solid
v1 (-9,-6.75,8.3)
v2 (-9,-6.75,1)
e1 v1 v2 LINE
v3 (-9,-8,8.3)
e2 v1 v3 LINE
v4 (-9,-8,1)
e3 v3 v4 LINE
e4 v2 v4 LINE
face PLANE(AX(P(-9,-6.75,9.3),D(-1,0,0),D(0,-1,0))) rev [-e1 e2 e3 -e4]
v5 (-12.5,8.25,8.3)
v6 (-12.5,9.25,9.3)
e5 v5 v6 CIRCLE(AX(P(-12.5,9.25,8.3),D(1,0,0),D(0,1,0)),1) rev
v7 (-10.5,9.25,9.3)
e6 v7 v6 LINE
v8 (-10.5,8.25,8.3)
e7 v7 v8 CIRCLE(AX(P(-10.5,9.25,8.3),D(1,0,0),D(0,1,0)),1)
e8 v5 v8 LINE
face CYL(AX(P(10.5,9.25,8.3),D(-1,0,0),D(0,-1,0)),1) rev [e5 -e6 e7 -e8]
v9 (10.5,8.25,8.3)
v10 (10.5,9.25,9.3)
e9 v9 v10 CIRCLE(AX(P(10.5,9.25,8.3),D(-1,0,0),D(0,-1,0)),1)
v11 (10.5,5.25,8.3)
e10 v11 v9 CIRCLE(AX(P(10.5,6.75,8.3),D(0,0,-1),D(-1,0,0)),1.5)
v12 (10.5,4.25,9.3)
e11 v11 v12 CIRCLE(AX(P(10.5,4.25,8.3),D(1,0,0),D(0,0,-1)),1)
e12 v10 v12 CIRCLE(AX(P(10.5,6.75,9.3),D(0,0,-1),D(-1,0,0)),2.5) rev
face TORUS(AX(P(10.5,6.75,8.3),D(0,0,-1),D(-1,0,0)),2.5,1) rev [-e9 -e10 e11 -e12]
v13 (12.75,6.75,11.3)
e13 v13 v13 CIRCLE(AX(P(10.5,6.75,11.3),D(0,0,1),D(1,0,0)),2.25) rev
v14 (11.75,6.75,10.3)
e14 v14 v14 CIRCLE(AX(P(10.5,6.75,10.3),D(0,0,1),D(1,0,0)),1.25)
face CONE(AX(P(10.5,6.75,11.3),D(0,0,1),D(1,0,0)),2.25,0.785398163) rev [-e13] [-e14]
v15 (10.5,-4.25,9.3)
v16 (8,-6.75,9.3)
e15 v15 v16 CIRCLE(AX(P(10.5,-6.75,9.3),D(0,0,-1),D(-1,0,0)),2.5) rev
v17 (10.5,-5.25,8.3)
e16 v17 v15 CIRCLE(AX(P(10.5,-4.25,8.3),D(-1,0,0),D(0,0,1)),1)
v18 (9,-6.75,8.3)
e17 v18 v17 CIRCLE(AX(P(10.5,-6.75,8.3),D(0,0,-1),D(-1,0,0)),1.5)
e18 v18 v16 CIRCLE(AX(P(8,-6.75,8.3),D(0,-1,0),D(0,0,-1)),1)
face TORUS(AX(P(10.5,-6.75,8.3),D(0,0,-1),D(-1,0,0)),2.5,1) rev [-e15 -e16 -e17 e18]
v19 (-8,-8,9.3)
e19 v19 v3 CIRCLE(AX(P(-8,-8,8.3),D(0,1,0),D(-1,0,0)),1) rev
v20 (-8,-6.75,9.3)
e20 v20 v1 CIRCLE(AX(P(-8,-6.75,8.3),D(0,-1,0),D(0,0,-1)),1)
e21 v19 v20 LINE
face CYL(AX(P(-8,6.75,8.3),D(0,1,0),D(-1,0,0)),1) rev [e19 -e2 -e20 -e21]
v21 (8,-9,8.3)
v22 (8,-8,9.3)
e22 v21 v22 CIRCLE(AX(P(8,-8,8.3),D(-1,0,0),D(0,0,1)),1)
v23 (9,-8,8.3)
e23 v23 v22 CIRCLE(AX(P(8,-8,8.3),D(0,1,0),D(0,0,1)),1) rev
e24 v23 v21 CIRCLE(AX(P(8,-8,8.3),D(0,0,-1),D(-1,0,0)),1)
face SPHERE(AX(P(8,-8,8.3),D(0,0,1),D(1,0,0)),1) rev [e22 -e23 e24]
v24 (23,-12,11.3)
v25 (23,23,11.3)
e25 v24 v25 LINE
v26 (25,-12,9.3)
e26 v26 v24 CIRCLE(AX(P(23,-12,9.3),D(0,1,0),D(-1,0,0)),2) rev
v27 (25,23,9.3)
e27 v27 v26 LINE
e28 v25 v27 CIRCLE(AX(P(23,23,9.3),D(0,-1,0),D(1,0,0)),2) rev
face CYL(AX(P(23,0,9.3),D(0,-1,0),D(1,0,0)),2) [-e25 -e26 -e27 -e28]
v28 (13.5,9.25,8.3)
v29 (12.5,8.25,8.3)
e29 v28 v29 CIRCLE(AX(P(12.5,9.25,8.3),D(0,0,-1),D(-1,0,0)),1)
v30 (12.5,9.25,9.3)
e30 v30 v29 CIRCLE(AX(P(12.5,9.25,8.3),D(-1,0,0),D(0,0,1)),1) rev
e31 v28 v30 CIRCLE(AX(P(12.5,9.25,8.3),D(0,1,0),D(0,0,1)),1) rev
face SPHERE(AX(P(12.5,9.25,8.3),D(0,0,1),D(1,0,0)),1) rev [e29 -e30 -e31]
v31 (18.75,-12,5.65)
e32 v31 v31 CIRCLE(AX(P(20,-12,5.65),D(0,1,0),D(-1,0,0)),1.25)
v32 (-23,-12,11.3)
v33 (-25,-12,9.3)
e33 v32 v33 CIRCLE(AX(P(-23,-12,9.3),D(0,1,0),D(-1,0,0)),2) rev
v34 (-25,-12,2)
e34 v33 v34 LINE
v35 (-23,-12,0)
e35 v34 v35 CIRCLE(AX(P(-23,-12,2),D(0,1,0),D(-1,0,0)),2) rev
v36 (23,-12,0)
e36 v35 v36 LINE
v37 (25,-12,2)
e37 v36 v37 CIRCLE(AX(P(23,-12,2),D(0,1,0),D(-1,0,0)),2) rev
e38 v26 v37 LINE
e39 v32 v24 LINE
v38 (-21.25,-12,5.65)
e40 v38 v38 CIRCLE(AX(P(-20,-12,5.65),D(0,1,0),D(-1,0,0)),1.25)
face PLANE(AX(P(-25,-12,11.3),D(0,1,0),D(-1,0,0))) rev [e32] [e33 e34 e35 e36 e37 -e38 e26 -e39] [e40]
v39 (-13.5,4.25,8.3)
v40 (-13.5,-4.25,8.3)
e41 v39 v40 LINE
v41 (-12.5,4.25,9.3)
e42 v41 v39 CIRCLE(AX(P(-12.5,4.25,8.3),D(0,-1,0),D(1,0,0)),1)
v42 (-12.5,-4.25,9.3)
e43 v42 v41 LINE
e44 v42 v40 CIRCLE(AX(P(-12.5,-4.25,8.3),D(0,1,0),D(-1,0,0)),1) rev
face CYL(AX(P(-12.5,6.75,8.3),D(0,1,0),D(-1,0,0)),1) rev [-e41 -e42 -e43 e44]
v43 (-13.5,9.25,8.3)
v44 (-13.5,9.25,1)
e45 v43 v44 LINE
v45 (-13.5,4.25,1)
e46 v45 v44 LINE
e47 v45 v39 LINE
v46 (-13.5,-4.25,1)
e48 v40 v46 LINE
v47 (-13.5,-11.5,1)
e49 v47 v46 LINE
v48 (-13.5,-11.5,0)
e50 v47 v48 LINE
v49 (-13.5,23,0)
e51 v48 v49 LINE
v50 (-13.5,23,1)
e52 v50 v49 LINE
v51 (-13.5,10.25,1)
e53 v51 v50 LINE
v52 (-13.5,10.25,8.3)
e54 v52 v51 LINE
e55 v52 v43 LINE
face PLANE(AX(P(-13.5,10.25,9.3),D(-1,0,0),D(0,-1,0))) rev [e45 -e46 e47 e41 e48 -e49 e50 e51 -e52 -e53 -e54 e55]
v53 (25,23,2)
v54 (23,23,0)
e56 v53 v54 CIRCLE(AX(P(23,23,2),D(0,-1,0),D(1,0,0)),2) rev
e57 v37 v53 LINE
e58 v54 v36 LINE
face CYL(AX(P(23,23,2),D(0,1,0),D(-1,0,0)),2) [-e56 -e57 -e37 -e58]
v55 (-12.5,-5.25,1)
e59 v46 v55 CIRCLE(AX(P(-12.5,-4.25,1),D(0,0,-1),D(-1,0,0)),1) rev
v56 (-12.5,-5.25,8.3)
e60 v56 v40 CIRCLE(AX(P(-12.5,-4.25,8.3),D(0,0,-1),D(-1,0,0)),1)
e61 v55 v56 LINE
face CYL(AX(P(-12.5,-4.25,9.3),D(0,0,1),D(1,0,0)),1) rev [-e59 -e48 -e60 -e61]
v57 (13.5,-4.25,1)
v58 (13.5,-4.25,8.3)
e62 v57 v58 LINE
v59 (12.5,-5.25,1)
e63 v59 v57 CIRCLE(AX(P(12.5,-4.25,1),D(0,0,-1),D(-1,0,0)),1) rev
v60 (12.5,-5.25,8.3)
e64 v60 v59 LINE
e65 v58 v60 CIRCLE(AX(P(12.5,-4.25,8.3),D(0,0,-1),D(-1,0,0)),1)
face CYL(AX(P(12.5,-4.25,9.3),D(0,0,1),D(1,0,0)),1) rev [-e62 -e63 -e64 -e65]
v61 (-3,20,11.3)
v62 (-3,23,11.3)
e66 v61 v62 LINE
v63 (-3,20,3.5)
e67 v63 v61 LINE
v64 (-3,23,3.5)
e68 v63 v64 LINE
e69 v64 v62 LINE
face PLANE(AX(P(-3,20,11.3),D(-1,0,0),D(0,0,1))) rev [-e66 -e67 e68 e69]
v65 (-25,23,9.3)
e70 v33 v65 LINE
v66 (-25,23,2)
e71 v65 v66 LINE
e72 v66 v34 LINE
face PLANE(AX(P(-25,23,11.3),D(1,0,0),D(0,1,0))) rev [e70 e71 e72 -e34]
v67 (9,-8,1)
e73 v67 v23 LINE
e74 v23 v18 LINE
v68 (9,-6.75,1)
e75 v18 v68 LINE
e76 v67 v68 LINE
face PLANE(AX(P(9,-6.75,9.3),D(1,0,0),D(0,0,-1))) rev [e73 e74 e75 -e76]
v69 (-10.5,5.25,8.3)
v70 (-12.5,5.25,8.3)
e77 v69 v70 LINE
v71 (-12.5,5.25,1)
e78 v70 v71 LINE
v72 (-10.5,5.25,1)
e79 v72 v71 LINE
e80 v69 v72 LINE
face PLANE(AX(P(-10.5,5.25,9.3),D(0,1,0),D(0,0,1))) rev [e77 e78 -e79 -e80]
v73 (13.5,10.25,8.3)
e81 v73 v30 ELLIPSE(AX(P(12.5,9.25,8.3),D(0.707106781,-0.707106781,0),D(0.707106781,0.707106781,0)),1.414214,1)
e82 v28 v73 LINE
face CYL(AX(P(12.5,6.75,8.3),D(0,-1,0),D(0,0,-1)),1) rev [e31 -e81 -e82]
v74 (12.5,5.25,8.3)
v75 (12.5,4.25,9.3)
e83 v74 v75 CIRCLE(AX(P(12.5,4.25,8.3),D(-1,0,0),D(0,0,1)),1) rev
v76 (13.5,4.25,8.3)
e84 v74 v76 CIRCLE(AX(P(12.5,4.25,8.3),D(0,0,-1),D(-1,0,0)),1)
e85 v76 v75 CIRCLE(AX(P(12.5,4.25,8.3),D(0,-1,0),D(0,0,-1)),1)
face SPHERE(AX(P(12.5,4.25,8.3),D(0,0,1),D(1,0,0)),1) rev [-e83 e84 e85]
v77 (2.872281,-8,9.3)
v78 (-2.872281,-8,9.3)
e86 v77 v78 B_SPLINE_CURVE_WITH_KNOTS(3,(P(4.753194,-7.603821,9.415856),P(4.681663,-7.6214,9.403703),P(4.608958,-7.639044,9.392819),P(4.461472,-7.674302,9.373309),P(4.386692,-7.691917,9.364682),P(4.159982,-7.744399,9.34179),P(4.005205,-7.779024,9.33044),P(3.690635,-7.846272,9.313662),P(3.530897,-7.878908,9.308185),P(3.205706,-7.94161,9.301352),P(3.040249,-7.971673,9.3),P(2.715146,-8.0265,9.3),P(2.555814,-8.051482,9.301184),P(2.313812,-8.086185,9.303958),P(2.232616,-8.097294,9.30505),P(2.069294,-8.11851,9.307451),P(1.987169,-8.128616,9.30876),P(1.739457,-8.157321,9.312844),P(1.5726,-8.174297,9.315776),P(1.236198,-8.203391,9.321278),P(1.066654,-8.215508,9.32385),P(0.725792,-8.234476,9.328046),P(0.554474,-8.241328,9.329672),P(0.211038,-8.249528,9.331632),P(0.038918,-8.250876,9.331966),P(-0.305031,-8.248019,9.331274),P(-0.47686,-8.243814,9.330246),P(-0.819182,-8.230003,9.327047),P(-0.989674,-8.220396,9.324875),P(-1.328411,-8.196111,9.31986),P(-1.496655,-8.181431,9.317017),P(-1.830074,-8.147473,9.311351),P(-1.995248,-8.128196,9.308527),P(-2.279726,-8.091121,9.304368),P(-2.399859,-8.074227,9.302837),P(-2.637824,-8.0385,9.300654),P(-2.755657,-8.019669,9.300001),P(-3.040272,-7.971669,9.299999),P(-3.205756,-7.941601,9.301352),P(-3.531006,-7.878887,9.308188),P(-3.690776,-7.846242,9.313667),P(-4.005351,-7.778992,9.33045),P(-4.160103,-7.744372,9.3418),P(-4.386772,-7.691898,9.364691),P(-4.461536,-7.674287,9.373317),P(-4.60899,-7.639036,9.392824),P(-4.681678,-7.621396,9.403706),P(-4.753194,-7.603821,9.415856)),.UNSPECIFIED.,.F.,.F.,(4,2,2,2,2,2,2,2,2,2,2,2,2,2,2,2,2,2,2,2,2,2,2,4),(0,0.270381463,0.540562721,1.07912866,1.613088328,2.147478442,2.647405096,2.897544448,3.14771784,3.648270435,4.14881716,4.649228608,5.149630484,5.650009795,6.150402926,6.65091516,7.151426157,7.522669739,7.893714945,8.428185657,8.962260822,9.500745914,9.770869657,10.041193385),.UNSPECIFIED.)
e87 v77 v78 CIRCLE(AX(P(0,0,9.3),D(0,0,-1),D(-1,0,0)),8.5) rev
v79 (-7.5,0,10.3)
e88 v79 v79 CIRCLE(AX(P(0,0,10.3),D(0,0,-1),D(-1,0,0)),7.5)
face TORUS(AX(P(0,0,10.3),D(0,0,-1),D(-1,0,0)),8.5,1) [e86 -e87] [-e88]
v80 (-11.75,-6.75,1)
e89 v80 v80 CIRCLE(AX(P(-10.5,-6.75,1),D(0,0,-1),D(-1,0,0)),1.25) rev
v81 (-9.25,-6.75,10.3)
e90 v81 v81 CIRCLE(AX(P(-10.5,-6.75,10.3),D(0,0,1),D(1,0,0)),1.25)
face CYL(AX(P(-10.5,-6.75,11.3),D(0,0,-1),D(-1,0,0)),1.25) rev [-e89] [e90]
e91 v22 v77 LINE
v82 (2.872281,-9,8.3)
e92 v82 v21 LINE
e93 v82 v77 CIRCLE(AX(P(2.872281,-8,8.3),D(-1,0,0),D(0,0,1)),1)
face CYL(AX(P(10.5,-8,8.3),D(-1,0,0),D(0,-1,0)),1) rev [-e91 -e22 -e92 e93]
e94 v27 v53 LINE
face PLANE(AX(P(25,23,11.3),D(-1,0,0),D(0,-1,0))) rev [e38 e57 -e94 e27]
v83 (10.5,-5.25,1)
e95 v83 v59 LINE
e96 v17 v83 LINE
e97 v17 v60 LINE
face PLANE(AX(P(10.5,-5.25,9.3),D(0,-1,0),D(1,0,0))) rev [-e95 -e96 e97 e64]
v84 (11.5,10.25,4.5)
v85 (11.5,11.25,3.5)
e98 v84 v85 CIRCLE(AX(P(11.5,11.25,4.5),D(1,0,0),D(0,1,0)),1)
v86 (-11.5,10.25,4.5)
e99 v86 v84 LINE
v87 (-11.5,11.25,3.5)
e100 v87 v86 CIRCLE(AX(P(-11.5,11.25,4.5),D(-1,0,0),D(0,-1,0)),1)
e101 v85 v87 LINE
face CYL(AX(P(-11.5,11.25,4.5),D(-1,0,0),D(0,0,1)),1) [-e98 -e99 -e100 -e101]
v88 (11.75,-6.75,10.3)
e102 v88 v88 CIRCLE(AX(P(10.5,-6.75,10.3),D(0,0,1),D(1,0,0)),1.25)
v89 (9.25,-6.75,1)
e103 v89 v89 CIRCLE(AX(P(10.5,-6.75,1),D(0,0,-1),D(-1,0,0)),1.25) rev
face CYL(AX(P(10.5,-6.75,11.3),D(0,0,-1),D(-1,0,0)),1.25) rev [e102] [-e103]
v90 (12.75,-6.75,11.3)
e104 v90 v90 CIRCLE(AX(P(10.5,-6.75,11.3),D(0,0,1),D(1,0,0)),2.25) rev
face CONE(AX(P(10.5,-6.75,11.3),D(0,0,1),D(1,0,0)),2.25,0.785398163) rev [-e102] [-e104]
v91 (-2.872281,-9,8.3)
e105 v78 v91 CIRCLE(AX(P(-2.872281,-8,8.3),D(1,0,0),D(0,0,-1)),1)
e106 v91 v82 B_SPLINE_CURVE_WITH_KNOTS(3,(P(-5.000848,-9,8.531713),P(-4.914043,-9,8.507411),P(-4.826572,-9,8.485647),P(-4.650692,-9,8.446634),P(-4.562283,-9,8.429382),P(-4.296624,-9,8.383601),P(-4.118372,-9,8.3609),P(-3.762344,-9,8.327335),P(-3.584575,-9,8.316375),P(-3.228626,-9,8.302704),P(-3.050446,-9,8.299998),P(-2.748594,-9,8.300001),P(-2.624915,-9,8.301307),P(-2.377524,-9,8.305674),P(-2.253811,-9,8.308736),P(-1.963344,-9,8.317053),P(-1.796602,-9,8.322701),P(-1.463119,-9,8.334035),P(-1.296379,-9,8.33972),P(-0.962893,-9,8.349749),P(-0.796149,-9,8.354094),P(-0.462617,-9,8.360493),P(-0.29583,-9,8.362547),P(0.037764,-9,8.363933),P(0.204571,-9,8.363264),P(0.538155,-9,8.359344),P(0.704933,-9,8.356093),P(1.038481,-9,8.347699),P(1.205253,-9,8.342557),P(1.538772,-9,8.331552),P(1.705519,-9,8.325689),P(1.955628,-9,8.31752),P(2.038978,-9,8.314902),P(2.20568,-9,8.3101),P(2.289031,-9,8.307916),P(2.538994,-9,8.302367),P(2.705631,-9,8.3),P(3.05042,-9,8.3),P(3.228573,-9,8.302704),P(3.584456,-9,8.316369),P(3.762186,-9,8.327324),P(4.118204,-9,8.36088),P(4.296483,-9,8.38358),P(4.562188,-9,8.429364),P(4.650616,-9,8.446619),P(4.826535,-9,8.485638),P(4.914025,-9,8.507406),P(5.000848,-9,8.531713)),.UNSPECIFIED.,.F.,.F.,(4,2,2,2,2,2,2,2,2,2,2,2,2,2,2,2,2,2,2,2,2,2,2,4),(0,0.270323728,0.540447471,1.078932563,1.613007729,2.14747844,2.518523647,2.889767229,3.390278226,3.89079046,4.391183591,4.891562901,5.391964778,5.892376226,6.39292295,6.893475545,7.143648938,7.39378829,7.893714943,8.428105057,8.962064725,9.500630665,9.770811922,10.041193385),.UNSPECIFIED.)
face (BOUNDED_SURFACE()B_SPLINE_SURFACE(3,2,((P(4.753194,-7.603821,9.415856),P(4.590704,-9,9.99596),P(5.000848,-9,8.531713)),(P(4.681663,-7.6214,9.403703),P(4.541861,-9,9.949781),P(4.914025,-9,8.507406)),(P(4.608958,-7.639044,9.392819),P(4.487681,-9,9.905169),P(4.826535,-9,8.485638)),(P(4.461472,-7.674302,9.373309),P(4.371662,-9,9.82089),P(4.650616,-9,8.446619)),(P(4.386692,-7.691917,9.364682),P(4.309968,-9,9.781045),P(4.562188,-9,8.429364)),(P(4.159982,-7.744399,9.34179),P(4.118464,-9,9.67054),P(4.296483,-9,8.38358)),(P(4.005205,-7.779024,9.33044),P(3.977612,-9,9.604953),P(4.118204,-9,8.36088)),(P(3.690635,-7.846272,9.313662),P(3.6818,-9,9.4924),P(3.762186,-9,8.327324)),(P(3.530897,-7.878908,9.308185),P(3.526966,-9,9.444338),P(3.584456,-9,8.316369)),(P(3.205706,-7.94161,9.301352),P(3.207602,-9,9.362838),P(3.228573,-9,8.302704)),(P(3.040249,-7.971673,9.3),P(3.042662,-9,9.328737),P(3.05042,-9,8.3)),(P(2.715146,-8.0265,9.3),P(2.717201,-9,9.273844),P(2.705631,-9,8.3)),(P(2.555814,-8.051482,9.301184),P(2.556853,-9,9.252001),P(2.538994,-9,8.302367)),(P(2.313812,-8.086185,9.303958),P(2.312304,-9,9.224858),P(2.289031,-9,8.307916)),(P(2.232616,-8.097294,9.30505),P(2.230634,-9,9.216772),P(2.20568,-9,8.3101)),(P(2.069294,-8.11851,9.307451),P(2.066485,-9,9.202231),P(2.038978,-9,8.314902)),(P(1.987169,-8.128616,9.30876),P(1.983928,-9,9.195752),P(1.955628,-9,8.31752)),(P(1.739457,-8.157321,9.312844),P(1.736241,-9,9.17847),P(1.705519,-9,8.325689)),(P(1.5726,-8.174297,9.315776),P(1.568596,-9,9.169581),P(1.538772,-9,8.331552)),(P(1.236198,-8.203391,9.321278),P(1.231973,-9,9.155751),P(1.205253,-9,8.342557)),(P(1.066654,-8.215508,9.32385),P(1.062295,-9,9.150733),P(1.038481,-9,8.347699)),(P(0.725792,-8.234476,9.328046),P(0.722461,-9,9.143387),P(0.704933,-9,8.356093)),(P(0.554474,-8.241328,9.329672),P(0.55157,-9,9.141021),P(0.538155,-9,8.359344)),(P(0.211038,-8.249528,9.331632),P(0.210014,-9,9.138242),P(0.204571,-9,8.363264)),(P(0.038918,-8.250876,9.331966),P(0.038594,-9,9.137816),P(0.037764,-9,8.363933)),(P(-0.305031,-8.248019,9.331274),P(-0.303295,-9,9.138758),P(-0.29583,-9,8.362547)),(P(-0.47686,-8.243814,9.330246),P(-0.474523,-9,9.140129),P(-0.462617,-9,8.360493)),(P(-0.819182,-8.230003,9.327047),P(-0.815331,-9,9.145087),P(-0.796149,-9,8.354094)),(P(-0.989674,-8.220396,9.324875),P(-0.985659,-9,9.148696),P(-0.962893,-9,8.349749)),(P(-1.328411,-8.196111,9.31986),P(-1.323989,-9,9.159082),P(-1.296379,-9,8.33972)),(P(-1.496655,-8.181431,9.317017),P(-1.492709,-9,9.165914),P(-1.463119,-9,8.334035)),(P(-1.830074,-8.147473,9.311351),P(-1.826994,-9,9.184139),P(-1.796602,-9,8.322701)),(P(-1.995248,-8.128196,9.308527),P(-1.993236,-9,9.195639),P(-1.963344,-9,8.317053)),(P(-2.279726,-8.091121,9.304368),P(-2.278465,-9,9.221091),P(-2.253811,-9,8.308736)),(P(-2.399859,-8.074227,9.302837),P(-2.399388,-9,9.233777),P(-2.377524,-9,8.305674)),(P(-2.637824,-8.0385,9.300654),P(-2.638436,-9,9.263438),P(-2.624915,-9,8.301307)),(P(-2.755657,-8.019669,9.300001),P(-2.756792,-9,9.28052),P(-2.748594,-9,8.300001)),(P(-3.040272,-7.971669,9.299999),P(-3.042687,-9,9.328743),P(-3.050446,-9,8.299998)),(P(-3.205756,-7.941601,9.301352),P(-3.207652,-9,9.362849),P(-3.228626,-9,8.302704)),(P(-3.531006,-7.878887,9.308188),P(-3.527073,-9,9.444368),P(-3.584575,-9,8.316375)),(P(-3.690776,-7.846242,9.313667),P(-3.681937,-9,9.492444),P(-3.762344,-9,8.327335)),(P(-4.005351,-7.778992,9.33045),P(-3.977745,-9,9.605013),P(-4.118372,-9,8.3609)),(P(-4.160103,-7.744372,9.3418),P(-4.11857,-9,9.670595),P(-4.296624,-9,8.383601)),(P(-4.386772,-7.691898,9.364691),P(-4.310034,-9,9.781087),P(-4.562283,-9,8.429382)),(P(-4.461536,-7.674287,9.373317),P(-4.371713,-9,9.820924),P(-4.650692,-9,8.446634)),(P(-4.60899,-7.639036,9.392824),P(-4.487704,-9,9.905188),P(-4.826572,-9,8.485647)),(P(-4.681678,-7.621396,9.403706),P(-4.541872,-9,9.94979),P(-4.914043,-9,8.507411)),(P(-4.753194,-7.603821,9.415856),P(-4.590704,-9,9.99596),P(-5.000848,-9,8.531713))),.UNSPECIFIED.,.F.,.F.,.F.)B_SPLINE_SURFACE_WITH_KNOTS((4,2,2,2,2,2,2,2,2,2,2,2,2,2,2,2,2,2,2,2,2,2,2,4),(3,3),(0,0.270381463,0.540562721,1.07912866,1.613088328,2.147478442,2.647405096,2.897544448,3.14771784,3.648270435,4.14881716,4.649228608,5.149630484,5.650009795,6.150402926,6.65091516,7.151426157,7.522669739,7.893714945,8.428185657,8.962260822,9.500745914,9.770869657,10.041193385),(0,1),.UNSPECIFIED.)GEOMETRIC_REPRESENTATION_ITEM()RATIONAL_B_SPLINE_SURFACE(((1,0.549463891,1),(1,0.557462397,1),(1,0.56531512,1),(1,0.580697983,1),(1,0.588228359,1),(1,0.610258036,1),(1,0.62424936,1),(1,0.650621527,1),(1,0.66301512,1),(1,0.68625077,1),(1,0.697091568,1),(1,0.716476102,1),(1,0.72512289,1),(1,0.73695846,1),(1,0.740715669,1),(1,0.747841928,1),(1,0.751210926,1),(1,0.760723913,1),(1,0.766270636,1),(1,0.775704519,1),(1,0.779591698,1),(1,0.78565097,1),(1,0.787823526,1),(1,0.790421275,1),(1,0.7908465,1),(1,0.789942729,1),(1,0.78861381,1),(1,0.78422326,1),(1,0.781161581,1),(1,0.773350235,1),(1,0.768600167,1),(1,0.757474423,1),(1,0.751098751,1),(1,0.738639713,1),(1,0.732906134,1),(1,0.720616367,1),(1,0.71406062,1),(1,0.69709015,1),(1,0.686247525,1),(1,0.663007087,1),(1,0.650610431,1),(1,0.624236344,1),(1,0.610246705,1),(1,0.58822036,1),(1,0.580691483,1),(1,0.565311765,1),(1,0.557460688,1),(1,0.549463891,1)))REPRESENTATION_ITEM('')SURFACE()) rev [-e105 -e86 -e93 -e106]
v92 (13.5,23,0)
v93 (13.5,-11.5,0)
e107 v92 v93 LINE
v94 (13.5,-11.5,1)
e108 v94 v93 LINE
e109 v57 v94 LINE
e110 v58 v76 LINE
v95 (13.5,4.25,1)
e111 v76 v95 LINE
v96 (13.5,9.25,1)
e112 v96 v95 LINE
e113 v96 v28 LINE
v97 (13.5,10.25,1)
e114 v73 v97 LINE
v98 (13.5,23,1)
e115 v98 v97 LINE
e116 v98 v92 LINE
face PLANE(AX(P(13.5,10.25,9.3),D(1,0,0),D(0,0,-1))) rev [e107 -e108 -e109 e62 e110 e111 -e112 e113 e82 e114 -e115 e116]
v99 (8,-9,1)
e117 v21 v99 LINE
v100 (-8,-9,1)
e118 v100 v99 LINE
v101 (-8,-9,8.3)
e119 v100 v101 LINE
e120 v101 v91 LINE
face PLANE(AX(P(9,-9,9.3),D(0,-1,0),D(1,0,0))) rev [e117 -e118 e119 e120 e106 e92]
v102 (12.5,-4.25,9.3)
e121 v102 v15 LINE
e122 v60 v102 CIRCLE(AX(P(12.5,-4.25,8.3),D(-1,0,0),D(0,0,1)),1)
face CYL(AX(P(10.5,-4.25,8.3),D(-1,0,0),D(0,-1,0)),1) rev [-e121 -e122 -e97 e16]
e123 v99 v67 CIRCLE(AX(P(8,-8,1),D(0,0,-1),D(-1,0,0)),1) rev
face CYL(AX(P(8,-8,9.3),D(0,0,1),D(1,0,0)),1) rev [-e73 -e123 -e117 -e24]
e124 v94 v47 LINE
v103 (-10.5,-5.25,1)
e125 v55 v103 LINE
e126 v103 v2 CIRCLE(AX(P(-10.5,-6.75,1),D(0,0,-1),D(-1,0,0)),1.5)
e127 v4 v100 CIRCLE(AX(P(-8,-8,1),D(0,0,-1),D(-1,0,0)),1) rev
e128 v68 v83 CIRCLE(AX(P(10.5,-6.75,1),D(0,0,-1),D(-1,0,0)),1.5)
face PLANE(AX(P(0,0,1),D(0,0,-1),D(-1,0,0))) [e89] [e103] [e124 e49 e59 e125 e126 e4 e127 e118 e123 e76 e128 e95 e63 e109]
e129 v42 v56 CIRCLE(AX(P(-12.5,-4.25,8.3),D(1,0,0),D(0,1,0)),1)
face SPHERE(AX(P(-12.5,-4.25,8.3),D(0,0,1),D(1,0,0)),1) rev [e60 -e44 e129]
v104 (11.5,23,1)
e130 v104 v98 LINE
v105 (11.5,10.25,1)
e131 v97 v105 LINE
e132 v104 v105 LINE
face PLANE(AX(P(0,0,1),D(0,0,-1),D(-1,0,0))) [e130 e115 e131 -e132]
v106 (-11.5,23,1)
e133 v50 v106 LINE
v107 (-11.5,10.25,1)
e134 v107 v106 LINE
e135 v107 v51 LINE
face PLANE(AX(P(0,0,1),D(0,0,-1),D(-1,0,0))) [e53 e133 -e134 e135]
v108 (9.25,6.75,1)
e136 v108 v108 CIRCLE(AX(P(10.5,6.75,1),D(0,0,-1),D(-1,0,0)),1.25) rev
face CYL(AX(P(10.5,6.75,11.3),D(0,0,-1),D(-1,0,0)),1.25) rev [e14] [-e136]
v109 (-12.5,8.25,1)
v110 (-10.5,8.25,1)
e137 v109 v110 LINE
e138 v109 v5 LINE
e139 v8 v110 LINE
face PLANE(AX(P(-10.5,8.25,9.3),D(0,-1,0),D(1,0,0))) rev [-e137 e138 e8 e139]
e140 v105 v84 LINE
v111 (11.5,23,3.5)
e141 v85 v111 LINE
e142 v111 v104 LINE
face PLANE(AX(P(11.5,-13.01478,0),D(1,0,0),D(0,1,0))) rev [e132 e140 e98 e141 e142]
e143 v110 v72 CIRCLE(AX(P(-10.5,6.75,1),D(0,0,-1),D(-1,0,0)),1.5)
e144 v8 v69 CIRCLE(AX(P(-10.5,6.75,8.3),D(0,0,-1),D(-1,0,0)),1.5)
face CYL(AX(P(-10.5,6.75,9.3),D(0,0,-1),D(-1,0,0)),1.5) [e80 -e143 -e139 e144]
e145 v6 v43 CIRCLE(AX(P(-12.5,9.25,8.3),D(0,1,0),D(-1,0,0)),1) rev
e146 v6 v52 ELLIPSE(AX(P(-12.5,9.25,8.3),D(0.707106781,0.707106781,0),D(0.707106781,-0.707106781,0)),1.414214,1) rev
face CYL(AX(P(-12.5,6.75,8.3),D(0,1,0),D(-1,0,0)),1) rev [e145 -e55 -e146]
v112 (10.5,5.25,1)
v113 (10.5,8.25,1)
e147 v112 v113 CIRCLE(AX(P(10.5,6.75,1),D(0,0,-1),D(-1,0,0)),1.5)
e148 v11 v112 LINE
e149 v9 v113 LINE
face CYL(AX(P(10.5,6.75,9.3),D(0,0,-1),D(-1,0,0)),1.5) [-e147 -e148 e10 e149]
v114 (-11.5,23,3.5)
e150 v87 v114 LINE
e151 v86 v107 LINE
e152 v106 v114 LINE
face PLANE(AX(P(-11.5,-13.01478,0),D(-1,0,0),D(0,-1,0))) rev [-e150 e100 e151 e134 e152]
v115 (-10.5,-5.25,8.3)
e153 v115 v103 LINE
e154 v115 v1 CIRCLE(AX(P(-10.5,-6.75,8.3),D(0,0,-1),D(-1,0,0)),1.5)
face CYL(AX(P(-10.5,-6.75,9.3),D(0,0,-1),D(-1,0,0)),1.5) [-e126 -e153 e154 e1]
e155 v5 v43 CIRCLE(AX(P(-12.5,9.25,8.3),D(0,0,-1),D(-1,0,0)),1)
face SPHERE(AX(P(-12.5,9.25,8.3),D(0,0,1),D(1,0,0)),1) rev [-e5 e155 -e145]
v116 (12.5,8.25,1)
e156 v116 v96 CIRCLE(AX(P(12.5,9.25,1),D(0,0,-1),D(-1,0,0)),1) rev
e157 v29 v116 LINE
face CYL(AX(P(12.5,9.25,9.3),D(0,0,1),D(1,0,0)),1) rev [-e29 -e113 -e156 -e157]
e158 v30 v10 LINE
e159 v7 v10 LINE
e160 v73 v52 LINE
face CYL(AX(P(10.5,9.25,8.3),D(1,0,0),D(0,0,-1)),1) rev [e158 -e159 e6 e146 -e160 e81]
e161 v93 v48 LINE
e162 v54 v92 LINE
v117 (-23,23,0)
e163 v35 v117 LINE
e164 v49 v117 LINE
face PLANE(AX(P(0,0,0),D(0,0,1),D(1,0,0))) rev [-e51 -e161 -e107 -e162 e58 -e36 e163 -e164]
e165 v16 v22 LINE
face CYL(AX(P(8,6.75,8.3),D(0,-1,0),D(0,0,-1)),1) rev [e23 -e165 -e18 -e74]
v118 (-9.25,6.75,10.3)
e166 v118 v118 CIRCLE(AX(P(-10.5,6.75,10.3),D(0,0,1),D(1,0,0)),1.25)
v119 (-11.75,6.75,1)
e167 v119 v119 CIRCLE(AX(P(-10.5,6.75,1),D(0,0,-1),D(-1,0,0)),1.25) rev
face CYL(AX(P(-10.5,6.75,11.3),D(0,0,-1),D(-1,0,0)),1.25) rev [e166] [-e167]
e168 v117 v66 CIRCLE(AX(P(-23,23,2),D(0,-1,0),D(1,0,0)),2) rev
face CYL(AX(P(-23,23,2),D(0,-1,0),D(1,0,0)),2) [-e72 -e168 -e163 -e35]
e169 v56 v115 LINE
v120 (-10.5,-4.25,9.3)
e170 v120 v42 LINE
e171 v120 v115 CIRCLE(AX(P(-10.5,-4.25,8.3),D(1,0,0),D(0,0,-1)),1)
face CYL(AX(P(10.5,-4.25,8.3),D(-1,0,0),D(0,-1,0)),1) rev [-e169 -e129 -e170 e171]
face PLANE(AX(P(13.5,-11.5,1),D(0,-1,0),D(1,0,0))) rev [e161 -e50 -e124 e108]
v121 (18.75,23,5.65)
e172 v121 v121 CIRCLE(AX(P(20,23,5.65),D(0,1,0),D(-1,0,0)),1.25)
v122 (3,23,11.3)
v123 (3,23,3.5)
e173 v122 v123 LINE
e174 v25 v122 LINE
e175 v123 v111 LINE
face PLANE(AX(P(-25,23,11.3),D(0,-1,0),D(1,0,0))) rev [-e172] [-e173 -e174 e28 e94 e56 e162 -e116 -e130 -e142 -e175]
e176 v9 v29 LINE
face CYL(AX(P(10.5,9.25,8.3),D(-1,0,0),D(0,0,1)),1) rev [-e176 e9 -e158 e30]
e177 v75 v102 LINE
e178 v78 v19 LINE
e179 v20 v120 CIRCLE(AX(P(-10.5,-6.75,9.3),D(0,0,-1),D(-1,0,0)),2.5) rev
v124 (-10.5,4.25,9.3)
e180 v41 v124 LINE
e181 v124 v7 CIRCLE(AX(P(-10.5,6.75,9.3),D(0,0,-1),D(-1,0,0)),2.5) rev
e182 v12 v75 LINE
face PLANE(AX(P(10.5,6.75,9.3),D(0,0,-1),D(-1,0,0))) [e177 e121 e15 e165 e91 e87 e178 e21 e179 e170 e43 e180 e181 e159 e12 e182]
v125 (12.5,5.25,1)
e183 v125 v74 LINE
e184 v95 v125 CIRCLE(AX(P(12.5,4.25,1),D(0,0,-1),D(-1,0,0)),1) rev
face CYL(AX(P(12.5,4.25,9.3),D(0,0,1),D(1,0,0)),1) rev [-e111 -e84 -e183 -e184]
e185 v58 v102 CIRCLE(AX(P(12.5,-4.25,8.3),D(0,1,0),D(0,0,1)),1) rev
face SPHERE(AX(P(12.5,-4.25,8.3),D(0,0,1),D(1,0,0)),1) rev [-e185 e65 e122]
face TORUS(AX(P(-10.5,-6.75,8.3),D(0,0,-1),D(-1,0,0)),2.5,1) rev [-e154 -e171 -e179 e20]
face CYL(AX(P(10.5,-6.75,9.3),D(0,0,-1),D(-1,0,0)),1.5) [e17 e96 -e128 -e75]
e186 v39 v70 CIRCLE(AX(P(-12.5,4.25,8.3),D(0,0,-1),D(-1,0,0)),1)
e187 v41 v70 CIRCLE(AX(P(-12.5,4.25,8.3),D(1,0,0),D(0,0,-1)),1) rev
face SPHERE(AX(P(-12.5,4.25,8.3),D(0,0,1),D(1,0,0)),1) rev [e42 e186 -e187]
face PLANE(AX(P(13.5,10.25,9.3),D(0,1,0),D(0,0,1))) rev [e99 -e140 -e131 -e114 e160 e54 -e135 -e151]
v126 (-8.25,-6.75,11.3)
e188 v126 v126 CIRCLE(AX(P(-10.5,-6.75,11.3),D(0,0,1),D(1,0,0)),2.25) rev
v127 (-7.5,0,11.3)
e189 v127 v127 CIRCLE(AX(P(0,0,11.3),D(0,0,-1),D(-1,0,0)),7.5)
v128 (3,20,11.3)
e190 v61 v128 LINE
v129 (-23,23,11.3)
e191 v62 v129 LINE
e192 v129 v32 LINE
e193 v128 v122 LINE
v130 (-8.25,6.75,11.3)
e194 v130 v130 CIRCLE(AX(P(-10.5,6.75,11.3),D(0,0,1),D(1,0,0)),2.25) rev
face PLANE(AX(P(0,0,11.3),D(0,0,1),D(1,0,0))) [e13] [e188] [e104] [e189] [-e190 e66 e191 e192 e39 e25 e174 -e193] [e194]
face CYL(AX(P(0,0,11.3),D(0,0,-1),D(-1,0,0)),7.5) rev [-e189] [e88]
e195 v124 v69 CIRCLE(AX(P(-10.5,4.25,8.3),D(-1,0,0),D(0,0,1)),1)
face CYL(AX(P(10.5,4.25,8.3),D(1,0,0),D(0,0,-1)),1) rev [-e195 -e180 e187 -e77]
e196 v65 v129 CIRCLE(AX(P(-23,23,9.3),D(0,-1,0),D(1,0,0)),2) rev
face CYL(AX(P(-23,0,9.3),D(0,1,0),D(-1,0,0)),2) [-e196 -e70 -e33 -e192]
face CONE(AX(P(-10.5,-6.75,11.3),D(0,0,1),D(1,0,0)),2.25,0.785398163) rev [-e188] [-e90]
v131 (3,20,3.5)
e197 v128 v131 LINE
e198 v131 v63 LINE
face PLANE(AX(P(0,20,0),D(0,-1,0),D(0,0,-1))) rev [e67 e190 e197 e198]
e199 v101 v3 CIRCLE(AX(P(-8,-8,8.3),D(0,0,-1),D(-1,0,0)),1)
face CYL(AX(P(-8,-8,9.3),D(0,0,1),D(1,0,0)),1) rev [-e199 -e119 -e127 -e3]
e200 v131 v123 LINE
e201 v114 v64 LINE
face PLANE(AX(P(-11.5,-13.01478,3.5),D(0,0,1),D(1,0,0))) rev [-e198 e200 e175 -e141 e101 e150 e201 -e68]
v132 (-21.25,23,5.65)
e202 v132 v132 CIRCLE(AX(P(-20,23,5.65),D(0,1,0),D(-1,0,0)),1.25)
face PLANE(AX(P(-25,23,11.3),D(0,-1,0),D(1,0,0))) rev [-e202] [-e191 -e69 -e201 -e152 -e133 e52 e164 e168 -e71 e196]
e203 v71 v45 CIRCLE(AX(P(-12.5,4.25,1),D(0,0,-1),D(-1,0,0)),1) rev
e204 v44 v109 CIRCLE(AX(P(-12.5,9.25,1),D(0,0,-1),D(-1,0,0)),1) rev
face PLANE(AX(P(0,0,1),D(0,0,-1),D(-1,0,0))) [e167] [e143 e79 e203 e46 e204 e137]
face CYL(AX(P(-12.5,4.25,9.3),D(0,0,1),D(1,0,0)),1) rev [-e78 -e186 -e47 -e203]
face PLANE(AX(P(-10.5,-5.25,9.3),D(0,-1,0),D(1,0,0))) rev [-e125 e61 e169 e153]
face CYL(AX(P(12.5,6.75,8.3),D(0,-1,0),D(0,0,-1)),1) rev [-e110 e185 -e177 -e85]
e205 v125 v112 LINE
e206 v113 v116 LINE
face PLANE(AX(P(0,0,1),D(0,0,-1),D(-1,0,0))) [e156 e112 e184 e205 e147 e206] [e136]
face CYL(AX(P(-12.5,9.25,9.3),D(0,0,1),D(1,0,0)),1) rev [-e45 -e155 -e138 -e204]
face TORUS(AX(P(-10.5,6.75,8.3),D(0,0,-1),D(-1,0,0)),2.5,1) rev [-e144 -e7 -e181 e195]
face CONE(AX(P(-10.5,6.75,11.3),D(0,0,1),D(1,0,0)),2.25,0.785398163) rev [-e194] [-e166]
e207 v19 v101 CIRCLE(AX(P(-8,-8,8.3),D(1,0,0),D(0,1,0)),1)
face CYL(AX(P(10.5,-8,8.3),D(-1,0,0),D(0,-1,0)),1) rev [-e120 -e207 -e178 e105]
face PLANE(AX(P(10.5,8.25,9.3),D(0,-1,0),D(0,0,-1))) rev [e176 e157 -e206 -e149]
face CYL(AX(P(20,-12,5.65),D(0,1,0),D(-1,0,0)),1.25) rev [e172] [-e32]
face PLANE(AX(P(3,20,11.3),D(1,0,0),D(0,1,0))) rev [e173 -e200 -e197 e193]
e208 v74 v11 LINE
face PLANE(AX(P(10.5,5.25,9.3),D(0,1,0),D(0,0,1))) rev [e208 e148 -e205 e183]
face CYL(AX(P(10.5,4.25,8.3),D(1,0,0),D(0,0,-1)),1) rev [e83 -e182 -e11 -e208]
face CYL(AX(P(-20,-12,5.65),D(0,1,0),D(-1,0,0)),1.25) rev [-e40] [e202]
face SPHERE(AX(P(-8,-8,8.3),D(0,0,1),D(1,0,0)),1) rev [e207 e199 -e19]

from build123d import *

# Parameters (mm, degrees)
SKETCH_1_W             = 50
SKETCH_1_H             = 35
EXTRUDE_445_DEPTH      = 11.3
SKETCH_2_R             = 7.5
SKETCH_2_R_2           = 1.25
CUT_EXTRUDE_665_DEPTH  = 36.800698317
CUT_EXTRUDE_1135_DEPTH = 9.3
SKETCH_4_W             = 27
SKETCH_4_H             = 34.5
CUT_EXTRUDE_1595_DEPTH = 1
SKETCH_5_W             = 23
SKETCH_5_H             = 3.5
CUT_EXTRUDE_1822_DEPTH = 12.75
FILLET_1_R             = 1
FILLET_3_R             = 1
SKETCH_7_R             = 1.25
CUT_EXTRUDE_3943_DEPTH = 45.471226653
SKETCH_8_W             = 6
SKETCH_8_H             = 7.8
CUT_EXTRUDE_4259_DEPTH = 3
CHAMFER_1_SIZE         = 1
FILLET_2_R             = 2


with BuildPart() as part:
    # Эскиз1 → Extrude 445 (new body)
    with BuildSketch(Plane.XY):
        with Locations((0, 5.5)):
            Rectangle(SKETCH_1_W, SKETCH_1_H)
    extrude(amount=EXTRUDE_445_DEPTH)

    # Эскиз2 → Cut-Extrude 665 (cut, through all)
    with BuildSketch(Plane(origin=(0, 0, 0), x_dir=(-1, 0, 0), z_dir=(0, 0, -1))):
        Circle(SKETCH_2_R)
        with Locations((-10.5, 6.75)):
            Circle(SKETCH_2_R_2)
        with Locations((10.5, 6.75)):
            Circle(SKETCH_2_R_2)
        with Locations((10.5, -6.75)):
            Circle(SKETCH_2_R_2)
        with Locations((-10.5, -6.75)):
            Circle(SKETCH_2_R_2)
    extrude(amount=-CUT_EXTRUDE_665_DEPTH, mode=Mode.SUBTRACT)

    # Эскиз3 → Cut-Extrude 1135 (cut)
    with BuildSketch(Plane(origin=(0, 0, 0), x_dir=(-1, 0, 0), z_dir=(0, 0, -1))):
        with BuildLine():
            Line((-13.5, 10.25), (13.5, 10.25))
            Line((13.5, 10.25), (13.5, 8.25))
            Line((13.5, 8.25), (10.5, 8.25))
            ThreePointArc((10.5, 8.25), (9, 6.75), (10.5, 5.25))
            Line((10.5, 5.25), (13.5, 5.25))
            Line((13.5, 5.25), (13.5, -5.25))
            Line((13.5, -5.25), (10.5, -5.25))
            ThreePointArc((10.5, -5.25), (9.439339828, -5.689339828), (9, -6.75))
            Line((9, -6.75), (9, -9))
            Line((9, -9), (-9, -9))
            Line((-9, -9), (-9, -6.75))
            ThreePointArc((-9, -6.75), (-9.439339828, -5.689339828), (-10.5, -5.25))
            Line((-10.5, -5.25), (-13.5, -5.25))
            Line((-13.5, -5.25), (-13.5, 5.25))
            Line((-13.5, 5.25), (-10.5, 5.25))
            ThreePointArc((-10.5, 5.25), (-9, 6.75), (-10.5, 8.25))
            Line((-10.5, 8.25), (-13.5, 8.25))
            Line((-13.5, 8.25), (-13.5, 10.25))
        make_face()
    extrude(amount=-CUT_EXTRUDE_1135_DEPTH, mode=Mode.SUBTRACT)

    # Эскиз4 → Cut-Extrude 1595 (cut)
    with BuildSketch(Plane(origin=(0, 0, 0), x_dir=(-1, 0, 0), z_dir=(0, 0, -1))):
        with Locations((0, 5.75)):
            Rectangle(SKETCH_4_W, SKETCH_4_H)
    extrude(amount=-CUT_EXTRUDE_1595_DEPTH, mode=Mode.SUBTRACT)

    # Эскиз5 → Cut-Extrude 1822 (cut)
    with BuildSketch(Plane(origin=(0, 23, 0), x_dir=(1, 0, 0), z_dir=(0, 1, 0))):
        with Locations((0, -1.75)):
            Rectangle(SKETCH_5_W, SKETCH_5_H)
    extrude(amount=-CUT_EXTRUDE_1822_DEPTH, mode=Mode.SUBTRACT)

    # Скругление1
    fillet_1_edges = [part.edges().sort_by_distance(p)[0] for p in [
        (0, 10.25, 3.5),
        (7.5, 0, 9.3),
    ]]
    fillet(fillet_1_edges, radius=FILLET_1_R)

    # Скругление3
    fillet_3_edges = [part.edges().sort_by_distance(p)[0] for p in [
        (13.5, 9.25, 9.3),
        (13.5, 8.25, 5.15),
        (0, 10.25, 9.3),
        (-13.5, 9.25, 9.3),
        (-12, 8.25, 9.3),
        (-13.5, 8.25, 5.15),
        (-9, 6.75, 9.3),
        (-12, 5.25, 9.3),
        (-13.5, 0, 9.3),
        (-13.5, 5.25, 5.15),
        (-12, -5.25, 9.3),
        (-13.5, -5.25, 5.15),
        (-9.439339828, -5.689339828, 9.3),
        (-9, -7.875, 9.3),
        (0, -9, 9.3),
        (-9, -9, 5.15),
        (9, -7.875, 9.3),
        (9, -9, 5.15),
        (9.439339828, -5.689339828, 9.3),
        (12, -5.25, 9.3),
        (13.5, 0, 9.3),
        (13.5, -5.25, 5.15),
        (12, 5.25, 9.3),
        (13.5, 5.25, 5.15),
        (9, 6.75, 9.3),
        (12, 8.25, 9.3),
    ]]
    fillet(fillet_3_edges, radius=FILLET_3_R - 0.0001)  # a hair under: the kernel refuses the full size

    # Эскиз7 → Cut-Extrude 3943 (cut, through all)
    with BuildSketch(Plane(origin=(0, 23, 0), x_dir=(1, 0, 0), z_dir=(0, 1, 0))):
        with Locations(Location((-20, -5.65, 0), (0, 0, 180))):
            Circle(SKETCH_7_R)
        with Locations(Location((20, -5.65, 0), (0, 0, 180))):
            Circle(SKETCH_7_R)
    extrude(amount=-CUT_EXTRUDE_3943_DEPTH, mode=Mode.SUBTRACT)

    # Эскиз8 → Cut-Extrude 4259 (cut)
    with BuildSketch(Plane(origin=(0, 23, 0), x_dir=(1, 0, 0), z_dir=(0, 1, 0))):
        with Locations((0, -7.4)):
            Rectangle(SKETCH_8_W, SKETCH_8_H)
    extrude(amount=-CUT_EXTRUDE_4259_DEPTH, mode=Mode.SUBTRACT)

    # Фаска1
    chamfer_1_edges = [part.edges().sort_by_distance(p)[0] for p in [
        (11.75, 6.75, 11.3),
        (-9.25, 6.75, 11.3),
        (-9.25, -6.75, 11.3),
        (11.75, -6.75, 11.3),
    ]]
    chamfer(chamfer_1_edges, length=CHAMFER_1_SIZE)

    # Скругление2
    fillet_2_edges = [part.edges().sort_by_distance(p)[0] for p in [
        (25, 5.5, 11.3),
        (-25, 5.5, 11.3),
        (25, 5.5, 0),
        (-25, 5.5, 0),
    ]]
    fillet(fillet_2_edges, radius=FILLET_2_R)


solid = part.part
